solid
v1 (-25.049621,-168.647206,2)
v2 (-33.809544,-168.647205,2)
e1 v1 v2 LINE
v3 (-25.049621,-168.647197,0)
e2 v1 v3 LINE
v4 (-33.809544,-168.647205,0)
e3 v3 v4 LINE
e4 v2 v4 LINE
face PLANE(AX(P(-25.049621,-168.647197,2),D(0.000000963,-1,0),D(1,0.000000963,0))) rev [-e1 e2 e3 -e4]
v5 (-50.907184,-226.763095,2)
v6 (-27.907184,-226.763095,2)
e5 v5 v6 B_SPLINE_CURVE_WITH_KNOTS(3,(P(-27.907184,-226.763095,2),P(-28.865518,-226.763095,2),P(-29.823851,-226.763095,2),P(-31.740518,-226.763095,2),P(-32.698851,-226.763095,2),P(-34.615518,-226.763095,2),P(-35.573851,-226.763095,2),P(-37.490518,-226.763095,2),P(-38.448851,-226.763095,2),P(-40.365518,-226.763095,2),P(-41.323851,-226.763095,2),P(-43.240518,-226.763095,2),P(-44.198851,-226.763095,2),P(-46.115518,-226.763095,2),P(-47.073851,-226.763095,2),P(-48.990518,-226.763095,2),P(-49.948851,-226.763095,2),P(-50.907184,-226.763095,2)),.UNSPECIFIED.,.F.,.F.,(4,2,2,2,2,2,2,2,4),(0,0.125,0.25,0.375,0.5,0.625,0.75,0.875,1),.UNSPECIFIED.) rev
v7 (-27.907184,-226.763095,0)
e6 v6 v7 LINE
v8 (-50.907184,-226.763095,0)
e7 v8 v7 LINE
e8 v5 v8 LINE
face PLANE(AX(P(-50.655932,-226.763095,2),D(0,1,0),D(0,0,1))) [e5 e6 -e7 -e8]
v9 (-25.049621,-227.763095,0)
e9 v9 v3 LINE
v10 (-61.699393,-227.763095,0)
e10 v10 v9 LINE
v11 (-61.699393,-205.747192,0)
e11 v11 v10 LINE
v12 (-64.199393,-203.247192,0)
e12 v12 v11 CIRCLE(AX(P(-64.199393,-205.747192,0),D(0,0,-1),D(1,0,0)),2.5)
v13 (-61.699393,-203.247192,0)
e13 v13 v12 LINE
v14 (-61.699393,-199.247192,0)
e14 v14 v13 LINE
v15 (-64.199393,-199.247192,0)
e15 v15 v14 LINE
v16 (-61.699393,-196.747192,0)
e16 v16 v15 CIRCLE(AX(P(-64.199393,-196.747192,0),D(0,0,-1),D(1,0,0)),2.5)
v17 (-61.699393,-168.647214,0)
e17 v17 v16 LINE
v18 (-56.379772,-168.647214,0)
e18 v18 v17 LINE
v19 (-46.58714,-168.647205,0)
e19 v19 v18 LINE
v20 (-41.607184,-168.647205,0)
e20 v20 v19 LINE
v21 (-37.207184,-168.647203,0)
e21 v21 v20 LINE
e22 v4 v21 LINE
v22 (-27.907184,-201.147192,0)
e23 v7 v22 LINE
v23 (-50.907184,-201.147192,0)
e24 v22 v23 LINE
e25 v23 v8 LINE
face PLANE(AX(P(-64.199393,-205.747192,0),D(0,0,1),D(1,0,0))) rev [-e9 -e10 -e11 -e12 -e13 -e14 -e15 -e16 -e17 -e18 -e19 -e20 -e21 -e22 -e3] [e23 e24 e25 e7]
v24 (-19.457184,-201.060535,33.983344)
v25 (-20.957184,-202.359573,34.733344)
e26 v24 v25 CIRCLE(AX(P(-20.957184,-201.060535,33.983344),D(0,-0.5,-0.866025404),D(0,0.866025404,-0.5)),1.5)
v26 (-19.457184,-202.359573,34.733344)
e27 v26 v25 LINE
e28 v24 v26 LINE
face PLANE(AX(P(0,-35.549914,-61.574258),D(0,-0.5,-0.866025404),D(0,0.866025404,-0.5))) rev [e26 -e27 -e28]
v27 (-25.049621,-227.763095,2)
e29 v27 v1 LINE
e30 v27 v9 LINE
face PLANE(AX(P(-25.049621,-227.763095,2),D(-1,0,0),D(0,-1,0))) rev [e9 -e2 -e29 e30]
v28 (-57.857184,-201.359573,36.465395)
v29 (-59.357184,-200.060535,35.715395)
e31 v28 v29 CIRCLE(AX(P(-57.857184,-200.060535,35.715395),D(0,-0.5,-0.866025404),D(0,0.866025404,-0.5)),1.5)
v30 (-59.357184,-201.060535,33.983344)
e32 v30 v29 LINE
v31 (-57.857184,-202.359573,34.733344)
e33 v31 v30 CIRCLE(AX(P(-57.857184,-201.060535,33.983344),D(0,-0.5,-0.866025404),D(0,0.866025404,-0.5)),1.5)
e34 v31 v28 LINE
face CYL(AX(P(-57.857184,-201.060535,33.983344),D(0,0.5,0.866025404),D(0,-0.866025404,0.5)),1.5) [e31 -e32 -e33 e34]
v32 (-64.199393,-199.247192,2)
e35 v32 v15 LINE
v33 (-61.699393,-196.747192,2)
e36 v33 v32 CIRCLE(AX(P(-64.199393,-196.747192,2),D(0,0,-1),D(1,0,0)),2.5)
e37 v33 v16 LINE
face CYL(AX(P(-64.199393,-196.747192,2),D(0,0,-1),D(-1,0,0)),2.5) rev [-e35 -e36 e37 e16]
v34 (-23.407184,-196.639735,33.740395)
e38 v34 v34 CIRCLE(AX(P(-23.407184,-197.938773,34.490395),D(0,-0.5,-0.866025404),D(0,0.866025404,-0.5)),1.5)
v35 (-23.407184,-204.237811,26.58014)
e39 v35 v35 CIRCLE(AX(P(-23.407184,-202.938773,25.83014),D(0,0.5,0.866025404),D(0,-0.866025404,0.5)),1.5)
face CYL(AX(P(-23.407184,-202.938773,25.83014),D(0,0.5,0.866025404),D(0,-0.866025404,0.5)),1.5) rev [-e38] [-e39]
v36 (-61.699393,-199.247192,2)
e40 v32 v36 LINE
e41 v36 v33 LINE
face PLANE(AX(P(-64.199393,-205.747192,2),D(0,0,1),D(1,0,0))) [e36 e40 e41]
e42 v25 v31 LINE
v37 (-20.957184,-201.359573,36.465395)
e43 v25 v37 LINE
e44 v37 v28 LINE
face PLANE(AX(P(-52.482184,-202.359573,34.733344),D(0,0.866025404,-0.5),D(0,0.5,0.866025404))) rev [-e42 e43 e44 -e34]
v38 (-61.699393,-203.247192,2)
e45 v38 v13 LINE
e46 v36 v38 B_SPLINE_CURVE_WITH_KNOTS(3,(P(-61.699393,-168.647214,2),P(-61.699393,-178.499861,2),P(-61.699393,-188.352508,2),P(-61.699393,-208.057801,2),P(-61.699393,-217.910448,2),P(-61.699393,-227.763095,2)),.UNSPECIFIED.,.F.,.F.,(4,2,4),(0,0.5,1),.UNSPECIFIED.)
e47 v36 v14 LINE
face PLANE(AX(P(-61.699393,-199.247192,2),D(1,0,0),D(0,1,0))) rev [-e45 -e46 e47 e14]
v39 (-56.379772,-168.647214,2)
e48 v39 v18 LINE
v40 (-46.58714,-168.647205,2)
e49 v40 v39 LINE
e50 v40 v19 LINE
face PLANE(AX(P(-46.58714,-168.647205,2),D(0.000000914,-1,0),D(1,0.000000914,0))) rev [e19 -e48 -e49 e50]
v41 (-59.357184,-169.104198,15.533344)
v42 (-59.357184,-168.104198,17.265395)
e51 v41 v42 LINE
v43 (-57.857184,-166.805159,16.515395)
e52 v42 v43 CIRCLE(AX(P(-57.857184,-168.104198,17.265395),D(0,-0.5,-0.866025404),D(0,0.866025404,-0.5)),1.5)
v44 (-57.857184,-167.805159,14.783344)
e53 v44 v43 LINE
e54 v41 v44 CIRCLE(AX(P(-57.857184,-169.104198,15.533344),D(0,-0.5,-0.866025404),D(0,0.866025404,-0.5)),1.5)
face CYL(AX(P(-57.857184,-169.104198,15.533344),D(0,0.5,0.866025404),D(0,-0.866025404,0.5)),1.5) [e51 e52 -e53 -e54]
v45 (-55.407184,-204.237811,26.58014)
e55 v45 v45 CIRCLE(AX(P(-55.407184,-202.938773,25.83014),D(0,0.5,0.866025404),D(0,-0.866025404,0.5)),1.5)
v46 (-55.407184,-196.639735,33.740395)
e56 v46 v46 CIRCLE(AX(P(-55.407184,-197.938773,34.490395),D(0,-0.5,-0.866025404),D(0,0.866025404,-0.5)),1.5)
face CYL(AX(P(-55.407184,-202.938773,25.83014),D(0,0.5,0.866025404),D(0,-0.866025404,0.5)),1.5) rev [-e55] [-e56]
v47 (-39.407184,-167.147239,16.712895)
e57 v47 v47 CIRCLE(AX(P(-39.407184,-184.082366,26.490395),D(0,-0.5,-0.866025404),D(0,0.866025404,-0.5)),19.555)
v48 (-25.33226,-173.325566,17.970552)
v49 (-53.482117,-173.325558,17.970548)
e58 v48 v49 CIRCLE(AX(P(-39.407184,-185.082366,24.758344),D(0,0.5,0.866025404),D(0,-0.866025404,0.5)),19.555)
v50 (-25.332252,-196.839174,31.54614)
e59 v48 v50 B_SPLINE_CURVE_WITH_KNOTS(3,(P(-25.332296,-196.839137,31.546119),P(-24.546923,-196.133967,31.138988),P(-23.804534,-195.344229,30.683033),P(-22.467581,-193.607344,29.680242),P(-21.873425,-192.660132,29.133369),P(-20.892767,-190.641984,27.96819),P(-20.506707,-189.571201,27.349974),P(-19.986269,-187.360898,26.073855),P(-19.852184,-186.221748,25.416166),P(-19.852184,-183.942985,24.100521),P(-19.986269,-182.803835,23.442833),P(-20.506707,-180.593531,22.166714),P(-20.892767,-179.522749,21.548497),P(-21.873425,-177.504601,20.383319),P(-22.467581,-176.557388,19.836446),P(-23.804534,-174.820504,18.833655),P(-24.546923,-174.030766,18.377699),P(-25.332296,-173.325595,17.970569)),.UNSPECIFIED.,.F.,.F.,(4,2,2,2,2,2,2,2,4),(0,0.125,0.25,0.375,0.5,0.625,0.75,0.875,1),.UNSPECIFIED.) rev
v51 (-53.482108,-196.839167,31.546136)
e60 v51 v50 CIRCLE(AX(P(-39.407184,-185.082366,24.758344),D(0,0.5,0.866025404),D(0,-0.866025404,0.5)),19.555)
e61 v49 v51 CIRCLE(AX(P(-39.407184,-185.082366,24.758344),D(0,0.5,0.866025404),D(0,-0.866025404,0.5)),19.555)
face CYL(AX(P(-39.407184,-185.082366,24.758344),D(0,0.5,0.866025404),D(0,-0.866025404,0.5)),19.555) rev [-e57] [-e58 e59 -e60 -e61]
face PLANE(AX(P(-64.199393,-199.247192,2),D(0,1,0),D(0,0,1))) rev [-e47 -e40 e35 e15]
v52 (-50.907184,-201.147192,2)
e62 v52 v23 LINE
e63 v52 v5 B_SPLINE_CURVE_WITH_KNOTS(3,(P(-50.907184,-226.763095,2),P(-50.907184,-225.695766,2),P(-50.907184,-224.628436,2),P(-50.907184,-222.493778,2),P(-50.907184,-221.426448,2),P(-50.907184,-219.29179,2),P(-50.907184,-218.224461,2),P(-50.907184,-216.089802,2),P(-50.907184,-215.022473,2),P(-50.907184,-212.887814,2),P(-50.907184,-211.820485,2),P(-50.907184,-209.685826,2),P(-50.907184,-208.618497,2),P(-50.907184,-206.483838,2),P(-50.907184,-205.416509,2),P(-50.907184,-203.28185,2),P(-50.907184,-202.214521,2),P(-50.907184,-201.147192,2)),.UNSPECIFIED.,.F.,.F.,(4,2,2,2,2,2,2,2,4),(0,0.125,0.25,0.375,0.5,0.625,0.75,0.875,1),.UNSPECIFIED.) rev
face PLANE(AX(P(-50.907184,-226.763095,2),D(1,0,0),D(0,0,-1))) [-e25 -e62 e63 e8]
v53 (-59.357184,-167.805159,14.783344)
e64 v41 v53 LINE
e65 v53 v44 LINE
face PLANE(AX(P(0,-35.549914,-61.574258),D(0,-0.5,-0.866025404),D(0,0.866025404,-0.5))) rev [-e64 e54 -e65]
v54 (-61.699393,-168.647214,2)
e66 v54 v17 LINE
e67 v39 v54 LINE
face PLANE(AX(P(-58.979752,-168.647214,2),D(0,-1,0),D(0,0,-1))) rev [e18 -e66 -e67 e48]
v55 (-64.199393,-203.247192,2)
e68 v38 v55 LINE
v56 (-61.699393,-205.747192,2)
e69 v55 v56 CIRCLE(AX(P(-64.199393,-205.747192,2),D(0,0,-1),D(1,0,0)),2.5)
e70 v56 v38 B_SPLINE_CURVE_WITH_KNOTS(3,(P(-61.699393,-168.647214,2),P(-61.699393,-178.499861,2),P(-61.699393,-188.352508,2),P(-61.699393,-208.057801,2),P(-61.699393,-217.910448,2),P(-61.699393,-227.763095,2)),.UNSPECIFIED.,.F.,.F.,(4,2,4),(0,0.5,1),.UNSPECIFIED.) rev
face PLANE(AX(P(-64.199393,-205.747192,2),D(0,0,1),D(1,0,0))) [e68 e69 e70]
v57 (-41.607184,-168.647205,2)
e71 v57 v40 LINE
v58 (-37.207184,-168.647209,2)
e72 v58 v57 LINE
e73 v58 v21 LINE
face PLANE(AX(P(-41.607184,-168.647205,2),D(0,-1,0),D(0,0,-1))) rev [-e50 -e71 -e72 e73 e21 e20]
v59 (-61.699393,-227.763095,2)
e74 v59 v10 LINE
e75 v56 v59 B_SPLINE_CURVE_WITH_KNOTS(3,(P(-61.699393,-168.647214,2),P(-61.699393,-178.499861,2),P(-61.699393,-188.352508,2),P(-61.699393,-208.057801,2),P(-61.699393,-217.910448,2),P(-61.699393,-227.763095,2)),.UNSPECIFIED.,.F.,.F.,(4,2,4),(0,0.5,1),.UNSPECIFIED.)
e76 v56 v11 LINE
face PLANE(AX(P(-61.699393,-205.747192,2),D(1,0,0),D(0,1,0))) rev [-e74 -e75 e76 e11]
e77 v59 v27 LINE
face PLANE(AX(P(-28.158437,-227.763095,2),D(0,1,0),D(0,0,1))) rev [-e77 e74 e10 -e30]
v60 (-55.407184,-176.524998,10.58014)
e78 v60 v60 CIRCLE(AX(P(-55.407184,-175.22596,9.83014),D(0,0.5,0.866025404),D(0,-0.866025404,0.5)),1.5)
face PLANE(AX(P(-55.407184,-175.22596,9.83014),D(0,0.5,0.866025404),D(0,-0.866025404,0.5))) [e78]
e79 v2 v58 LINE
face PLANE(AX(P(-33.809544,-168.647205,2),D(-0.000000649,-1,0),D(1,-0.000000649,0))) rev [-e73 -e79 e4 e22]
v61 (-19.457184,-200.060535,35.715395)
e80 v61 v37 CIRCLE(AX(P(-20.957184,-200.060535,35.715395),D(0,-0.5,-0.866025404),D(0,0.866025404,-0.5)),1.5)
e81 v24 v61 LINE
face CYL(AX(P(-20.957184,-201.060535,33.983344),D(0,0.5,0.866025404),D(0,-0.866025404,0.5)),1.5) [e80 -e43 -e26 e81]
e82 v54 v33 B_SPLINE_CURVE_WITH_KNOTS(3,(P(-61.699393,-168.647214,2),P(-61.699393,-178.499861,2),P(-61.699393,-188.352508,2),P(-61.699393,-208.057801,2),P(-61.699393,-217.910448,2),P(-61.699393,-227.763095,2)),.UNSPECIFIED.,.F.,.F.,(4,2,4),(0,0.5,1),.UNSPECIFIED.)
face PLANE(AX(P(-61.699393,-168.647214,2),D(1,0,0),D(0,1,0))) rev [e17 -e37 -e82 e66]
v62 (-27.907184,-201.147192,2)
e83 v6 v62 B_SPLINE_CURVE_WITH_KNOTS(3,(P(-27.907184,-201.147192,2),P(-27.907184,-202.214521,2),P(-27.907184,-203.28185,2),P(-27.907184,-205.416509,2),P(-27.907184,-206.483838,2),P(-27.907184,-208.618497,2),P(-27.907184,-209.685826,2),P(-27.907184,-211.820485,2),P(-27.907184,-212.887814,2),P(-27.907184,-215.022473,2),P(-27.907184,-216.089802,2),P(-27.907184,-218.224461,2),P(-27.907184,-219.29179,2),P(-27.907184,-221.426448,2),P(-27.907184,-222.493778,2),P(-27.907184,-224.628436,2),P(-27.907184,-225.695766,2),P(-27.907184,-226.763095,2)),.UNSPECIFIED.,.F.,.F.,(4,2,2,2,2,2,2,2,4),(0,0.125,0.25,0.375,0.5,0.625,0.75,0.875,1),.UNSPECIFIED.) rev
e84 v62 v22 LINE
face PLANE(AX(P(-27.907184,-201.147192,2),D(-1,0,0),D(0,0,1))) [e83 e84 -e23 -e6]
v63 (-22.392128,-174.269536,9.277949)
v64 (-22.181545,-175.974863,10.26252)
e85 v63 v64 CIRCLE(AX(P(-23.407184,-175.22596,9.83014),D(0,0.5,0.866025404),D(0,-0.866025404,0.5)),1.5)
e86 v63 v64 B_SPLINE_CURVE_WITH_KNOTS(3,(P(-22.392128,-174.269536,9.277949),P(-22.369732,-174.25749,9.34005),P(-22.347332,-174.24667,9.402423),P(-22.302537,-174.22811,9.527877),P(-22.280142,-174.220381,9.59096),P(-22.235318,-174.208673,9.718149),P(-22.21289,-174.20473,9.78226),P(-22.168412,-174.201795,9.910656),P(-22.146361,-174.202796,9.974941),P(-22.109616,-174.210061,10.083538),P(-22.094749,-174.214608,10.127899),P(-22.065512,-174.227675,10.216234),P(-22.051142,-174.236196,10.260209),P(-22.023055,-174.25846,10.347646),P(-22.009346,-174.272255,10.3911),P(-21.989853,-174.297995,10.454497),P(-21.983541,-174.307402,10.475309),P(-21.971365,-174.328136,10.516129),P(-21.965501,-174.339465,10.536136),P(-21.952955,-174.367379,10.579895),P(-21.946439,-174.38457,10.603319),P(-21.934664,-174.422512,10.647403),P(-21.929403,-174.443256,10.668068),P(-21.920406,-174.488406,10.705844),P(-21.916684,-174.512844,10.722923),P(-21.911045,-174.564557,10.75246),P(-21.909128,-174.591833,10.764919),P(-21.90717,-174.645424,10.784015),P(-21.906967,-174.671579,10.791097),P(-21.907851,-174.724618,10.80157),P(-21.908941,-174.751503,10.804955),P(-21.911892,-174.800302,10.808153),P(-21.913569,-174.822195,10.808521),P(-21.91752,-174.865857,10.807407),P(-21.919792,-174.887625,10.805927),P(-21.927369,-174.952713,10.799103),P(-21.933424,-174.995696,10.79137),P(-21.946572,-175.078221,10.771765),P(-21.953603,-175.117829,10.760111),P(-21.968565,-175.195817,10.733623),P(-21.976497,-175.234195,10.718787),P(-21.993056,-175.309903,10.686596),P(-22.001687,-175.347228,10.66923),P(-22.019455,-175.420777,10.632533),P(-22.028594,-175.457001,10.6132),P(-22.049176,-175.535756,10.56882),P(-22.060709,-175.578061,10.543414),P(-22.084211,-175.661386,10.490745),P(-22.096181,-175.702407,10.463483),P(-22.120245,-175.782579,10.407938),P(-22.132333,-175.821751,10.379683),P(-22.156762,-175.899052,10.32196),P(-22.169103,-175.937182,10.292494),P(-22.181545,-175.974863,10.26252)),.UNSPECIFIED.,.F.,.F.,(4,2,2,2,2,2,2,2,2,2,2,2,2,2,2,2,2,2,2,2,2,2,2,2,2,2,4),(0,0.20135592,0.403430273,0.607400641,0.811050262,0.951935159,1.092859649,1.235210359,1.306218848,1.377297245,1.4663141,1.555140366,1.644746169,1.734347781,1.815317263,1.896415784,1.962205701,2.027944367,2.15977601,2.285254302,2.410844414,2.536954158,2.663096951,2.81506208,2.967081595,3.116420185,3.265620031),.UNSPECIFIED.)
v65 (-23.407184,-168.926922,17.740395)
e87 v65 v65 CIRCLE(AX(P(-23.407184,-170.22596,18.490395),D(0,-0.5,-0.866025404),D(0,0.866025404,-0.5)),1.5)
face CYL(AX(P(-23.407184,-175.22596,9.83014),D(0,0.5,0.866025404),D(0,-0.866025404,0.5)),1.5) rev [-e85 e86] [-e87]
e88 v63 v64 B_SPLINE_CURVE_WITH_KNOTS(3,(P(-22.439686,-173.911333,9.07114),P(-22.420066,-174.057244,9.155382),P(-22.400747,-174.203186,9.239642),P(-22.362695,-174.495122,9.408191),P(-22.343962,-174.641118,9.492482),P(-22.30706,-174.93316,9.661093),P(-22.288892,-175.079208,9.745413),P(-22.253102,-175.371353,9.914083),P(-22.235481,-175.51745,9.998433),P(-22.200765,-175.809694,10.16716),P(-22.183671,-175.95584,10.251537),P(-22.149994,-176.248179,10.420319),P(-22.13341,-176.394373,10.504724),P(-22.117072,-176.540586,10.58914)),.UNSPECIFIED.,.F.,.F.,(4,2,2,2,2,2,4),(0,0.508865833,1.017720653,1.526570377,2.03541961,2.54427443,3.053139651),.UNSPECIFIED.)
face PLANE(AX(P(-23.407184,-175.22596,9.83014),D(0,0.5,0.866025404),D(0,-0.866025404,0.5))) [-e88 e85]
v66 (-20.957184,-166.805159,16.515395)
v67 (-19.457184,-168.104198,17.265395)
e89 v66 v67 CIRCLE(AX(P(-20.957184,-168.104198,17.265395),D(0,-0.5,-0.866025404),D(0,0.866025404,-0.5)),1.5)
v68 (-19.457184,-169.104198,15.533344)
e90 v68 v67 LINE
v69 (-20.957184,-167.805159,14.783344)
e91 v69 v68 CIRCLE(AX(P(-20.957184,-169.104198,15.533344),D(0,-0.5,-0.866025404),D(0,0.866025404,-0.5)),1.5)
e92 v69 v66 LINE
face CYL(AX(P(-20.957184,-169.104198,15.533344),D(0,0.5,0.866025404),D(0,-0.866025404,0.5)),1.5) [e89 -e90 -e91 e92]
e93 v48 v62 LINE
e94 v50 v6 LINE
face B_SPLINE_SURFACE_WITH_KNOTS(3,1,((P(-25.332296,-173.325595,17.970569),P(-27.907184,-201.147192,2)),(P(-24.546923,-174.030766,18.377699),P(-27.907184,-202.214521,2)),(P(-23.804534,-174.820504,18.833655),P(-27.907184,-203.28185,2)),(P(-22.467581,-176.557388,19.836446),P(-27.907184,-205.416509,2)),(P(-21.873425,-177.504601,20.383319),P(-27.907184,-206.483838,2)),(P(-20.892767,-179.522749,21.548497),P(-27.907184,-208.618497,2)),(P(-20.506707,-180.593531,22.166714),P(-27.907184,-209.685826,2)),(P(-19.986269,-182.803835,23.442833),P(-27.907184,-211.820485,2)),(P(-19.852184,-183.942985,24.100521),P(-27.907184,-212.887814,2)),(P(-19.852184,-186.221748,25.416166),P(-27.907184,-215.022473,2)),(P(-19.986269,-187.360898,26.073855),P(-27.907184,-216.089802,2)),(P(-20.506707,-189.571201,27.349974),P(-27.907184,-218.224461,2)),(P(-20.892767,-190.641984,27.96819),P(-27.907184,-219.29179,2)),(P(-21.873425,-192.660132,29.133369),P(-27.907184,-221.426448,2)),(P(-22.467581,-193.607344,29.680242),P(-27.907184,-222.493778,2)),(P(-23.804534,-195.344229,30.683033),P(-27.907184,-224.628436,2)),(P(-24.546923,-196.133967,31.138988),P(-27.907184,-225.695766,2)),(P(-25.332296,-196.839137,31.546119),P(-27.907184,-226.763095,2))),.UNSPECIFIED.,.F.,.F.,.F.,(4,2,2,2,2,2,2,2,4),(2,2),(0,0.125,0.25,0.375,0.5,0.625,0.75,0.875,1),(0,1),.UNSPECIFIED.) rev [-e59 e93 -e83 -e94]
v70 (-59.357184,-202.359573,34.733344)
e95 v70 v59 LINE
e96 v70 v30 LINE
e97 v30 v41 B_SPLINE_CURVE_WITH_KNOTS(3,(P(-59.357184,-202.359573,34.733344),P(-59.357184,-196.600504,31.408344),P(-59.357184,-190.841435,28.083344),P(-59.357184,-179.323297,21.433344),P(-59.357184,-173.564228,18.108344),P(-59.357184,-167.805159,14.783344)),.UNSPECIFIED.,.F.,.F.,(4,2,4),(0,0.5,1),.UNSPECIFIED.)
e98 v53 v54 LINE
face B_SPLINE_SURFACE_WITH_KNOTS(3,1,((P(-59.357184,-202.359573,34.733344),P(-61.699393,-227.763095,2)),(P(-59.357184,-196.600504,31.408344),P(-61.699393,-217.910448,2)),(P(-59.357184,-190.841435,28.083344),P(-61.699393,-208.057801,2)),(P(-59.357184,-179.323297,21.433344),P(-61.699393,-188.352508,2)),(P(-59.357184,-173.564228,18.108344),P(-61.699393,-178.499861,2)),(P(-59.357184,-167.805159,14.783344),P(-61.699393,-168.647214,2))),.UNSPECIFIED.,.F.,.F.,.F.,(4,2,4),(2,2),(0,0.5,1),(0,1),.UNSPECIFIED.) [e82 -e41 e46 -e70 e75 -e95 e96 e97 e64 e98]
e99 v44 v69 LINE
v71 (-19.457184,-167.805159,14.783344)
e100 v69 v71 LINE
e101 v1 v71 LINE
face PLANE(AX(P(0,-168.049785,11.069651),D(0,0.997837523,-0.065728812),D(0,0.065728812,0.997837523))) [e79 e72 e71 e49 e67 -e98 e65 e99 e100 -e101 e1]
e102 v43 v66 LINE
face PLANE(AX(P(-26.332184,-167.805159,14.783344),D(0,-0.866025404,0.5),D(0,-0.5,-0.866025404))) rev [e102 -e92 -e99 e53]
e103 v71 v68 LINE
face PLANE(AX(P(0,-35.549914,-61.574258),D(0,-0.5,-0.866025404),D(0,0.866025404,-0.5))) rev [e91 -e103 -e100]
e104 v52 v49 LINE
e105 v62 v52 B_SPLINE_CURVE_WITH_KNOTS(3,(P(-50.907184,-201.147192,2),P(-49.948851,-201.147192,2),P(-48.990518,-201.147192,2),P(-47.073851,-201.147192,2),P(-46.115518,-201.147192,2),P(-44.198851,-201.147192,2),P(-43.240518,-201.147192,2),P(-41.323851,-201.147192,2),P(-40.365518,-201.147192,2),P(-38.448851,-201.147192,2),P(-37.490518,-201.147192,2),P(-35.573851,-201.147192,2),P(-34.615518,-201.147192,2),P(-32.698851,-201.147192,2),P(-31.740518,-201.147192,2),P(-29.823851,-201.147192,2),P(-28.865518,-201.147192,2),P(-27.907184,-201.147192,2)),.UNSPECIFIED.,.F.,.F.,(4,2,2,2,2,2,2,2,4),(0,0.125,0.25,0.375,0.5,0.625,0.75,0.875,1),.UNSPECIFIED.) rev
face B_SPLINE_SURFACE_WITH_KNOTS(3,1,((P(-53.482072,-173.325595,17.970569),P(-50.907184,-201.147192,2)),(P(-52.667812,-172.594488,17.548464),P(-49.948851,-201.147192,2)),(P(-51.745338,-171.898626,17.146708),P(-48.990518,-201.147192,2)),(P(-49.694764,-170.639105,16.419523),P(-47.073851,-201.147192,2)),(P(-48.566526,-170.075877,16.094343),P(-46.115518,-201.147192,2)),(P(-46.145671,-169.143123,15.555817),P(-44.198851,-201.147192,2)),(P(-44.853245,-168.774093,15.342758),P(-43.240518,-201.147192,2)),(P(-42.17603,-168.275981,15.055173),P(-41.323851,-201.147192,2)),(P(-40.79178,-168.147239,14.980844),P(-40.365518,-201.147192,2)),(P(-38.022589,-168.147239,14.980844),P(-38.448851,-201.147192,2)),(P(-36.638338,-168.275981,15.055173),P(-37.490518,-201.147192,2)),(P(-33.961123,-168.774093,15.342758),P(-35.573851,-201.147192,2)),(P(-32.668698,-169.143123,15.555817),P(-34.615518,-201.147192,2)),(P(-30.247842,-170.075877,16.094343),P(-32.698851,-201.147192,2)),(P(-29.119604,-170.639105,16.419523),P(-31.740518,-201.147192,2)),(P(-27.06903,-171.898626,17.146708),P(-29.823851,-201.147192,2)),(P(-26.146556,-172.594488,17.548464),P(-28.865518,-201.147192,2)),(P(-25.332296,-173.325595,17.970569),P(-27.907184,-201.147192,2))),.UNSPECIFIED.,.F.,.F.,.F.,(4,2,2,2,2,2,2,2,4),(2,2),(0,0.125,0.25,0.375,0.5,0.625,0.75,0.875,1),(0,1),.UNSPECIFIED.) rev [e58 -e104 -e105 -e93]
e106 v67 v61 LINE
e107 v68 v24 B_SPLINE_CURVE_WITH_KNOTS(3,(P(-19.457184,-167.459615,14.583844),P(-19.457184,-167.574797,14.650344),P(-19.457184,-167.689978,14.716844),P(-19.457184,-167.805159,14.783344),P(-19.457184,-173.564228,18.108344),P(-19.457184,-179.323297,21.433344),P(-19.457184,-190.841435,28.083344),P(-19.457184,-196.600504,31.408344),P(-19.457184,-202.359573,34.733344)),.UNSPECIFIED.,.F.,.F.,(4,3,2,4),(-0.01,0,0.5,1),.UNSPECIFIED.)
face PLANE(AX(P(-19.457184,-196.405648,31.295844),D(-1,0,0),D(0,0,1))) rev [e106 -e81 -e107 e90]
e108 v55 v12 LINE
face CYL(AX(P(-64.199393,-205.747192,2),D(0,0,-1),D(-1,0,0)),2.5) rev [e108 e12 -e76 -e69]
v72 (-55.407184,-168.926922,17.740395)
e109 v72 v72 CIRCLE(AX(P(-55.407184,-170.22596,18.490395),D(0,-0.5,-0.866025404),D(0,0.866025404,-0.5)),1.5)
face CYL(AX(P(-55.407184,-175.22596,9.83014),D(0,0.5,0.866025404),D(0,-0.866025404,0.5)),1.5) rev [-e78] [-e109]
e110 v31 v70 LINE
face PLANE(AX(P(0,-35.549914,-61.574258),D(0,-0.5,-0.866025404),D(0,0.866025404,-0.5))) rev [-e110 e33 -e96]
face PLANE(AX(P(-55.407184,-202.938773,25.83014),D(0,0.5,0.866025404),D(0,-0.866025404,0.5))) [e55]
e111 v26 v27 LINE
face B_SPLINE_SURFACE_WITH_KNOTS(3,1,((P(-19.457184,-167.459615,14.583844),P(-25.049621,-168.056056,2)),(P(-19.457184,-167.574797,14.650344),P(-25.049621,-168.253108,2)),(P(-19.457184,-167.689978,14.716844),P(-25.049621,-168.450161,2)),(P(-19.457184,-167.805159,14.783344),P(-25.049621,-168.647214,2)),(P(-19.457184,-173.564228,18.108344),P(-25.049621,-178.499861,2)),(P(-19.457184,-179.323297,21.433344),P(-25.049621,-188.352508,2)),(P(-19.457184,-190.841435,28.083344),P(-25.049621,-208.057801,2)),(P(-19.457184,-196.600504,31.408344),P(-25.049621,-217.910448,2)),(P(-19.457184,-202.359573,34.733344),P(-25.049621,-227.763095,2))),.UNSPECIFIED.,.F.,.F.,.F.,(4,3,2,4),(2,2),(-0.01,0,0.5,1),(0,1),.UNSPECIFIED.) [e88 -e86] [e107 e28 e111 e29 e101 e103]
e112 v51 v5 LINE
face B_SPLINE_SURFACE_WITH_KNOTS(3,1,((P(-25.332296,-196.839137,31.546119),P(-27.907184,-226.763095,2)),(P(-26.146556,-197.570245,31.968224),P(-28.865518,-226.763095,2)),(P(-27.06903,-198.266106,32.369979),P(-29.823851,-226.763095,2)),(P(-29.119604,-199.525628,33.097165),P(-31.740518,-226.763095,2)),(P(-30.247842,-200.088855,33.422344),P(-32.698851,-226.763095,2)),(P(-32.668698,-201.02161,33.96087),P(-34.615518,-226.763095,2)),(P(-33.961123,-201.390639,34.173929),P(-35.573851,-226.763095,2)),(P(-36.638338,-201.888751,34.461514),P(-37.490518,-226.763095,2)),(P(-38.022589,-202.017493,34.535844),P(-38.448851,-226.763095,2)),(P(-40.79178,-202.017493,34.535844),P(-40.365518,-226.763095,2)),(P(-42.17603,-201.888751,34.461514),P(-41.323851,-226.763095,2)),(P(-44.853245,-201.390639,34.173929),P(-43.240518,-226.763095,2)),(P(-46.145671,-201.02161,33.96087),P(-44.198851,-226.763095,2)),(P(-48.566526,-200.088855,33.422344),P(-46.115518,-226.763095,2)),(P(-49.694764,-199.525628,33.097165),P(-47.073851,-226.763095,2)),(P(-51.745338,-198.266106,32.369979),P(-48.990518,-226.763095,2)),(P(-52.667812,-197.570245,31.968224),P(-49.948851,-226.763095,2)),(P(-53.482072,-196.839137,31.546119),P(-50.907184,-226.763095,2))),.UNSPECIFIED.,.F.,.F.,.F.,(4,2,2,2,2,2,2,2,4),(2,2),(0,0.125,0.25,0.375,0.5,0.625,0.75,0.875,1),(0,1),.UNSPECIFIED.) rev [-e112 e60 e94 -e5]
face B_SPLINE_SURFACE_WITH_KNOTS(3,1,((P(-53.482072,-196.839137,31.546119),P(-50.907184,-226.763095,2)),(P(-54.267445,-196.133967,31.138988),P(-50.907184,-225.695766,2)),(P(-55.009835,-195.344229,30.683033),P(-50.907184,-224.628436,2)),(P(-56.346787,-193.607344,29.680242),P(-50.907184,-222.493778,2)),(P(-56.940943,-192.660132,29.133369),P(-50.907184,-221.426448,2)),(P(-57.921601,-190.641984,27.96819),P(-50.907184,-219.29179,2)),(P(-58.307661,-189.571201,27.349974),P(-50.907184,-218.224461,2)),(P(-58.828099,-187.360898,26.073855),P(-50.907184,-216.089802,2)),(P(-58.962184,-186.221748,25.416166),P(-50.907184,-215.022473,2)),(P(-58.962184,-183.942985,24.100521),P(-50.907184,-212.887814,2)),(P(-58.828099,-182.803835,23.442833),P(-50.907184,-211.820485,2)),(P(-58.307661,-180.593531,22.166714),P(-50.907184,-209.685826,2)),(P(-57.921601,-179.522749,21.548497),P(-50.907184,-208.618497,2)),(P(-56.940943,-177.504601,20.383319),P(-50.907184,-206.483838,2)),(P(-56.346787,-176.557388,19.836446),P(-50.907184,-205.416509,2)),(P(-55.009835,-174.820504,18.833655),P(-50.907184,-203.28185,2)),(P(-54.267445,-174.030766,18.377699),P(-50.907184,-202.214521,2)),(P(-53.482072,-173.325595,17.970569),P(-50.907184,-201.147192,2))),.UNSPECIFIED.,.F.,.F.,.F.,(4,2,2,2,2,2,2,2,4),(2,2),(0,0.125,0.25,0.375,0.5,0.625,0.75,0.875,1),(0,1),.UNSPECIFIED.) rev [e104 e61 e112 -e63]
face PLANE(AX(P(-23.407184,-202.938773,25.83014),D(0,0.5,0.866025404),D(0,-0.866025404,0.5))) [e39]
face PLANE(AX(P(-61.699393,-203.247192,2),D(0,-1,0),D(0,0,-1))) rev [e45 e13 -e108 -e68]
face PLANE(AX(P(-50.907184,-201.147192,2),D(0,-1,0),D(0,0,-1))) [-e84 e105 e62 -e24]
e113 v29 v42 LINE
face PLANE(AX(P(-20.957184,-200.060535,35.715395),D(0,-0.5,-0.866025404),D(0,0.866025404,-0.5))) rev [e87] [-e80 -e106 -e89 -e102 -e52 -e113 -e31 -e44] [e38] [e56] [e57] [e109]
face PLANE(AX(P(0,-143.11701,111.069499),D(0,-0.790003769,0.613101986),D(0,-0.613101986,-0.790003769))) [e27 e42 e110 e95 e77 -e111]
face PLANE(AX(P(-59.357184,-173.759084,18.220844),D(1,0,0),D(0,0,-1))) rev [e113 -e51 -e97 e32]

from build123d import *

# Parameters (mm, degrees)
BOSS_EXTRUDE1_DEPTH = 2
SKETCH3_R           = 19.555
BOSS_EXTRUDE3_DEPTH = 2
SKETCH10_R          = 1.5
CUT_EXTRUDE1_DEPTH  = 10
BOSS_EXTRUDE4_START = 2
SKETCH11_R          = 2.25
SKETCH11_R_2        = 1.5
BOSS_EXTRUDE4_DEPTH = 2


with BuildPart() as part:
    # Sketch1 → Boss-Extrude1 (new body)
    with BuildSketch(Plane.XY):
        with BuildLine():
            Line((-41.607184222, -168.647205393), (-46.587139734, -168.647205393))
            Line((-46.587139734, -168.647205393), (-56.379772227, -168.647214346))
            Line((-56.379772227, -168.647214346), (-58.979752441, -168.647214346))
            Line((-58.979752441, -168.647214346), (-61.699393133, -168.647214346))
            Line((-61.699393133, -168.647214346), (-61.699393133, -196.747191902))
            ThreePointArc((-61.699393133, -196.747191902), (-62.43162618, -198.514958855), (-64.199393133, -199.247191902))
            Line((-64.199393133, -199.247191902), (-61.699393133, -199.247191902))
            Line((-61.699393133, -199.247191902), (-61.699393133, -203.247191902))
            Line((-61.699393133, -203.247191902), (-64.199393133, -203.247191902))
            ThreePointArc((-64.199393133, -203.247191902), (-62.43162618, -203.979424949), (-61.699393133, -205.747191902))
            Line((-61.699393133, -205.747191902), (-61.699393133, -227.763094952))
            Line((-61.699393133, -227.763094952), (-50.655931604, -227.763094952))
            Line((-50.655931604, -227.763094952), (-28.158436841, -227.763094952))
            Line((-28.158436841, -227.763094952), (-25.049620936, -227.763094952))
            Line((-25.049620936, -227.763094952), (-25.049620936, -168.647196959))
            Line((-25.049620936, -168.647196959), (-33.809543561, -168.647205393))
            Line((-33.809543561, -168.647205393), (-37.207184222, -168.647203189))
            Line((-37.207184222, -168.647203189), (-41.607184222, -168.647205393))
        make_face()
        Polygon((-50.655931604, -226.763094952), (-50.907184222, -226.763094952), (-50.907184222, -201.147191902), (-45.907184222, -201.147191902), (-32.907184222, -201.147191902), (-27.907184222, -201.147191902), (-27.907184222, -226.763094952), (-28.158436841, -226.763094952), align=None, mode=Mode.SUBTRACT)
    extrude(amount=BOSS_EXTRUDE1_DEPTH)



with BuildPart() as body_2:
    # Sketch3 → Boss-Extrude3 (new body)
    with BuildSketch(Plane(origin=(0, -34.549914252, -59.842206881), x_dir=(-1, 0, 0), z_dir=(0, -0.500000000000004, -0.8660254037844363))):
        with BuildLine():
            Line((20.957184222, -192.615202808), (26.332184222, -192.615202808))
            Line((26.332184222, -192.615202808), (28.207184222, -192.615202808))
            Line((28.207184222, -192.615202808), (30.057184222, -192.615202808))
            Line((30.057184222, -192.615202808), (52.482184222, -192.615202808))
            Line((52.482184222, -192.615202808), (57.857184222, -192.615202808))
            ThreePointArc((57.857184222, -192.615202808), (58.917844394, -192.17586298), (59.357184222, -191.115202808))
            Line((59.357184222, -191.115202808), (59.357184222, -185.740202808))
            Line((59.357184222, -185.740202808), (59.357184222, -159.590202808))
            Line((59.357184222, -159.590202808), (59.357184222, -154.215202808))
            ThreePointArc((59.357184222, -154.215202808), (58.917844394, -153.154542636), (57.857184222, -152.715202808))
            Line((57.857184222, -152.715202808), (52.482184222, -152.715202808))
            Line((52.482184222, -152.715202808), (26.332184222, -152.715202808))
            Line((26.332184222, -152.715202808), (20.957184222, -152.715202808))
            ThreePointArc((20.957184222, -152.715202808), (19.89652405, -153.154542636), (19.457184222, -154.215202808))
            Line((19.457184222, -154.215202808), (19.457184222, -159.590202808))
            Line((19.457184222, -159.590202808), (19.457184222, -185.740202808))
            Line((19.457184222, -185.740202808), (19.457184222, -191.115202808))
            ThreePointArc((19.457184222, -191.115202808), (19.89652405, -192.17586298), (20.957184222, -192.615202808))
        make_face()
        with Locations(Location((39.407184222, -172.665202808, 0), (0, 0, 270))):
            Circle(SKETCH3_R, mode=Mode.SUBTRACT)
        with BuildLine():
            ThreePointArc((53.157184222, -188.665202808), (55.407184222, -190.915202808), (57.657184222, -188.665202808))
            ThreePointArc((57.657184222, -188.665202808), (55.407184222, -186.415202808), (53.157184222, -188.665202808))
        make_face(mode=Mode.SUBTRACT)
        with BuildLine():
            ThreePointArc((53.157184222, -156.665202808), (55.407184222, -158.915202808), (57.657184222, -156.665202808))
            ThreePointArc((57.657184222, -156.665202808), (55.407184222, -154.415202808), (53.157184222, -156.665202808))
        make_face(mode=Mode.SUBTRACT)
        with BuildLine():
            ThreePointArc((21.157184222, -188.665202808), (23.407184222, -190.915202808), (25.657184222, -188.665202808))
            ThreePointArc((25.657184222, -188.665202808), (23.407184222, -186.415202808), (21.157184222, -188.665202808))
        make_face(mode=Mode.SUBTRACT)
        with BuildLine():
            ThreePointArc((21.157184222, -156.665202808), (23.407184222, -158.915202808), (25.657184222, -156.665202808))
            ThreePointArc((25.657184222, -156.665202808), (23.407184222, -154.415202808), (21.157184222, -156.665202808))
        make_face(mode=Mode.SUBTRACT)
    extrude(amount=BOSS_EXTRUDE3_DEPTH)


with BuildPart() as part_1:
    add(part.part)

    add(body_2.part)  # Loft1 merges body 2
    # Sketch6 → Loft1 section 0
    with BuildSketch(Plane(origin=(0, -35.549914252, -61.574257689), x_dir=(-1, 0, 0), z_dir=(0, -0.5000000000000042, -0.8660254037844362))):
        with BuildLine():
            Line((19.457184222, -152.715202808), (59.357184222, -152.715202808))
            Line((59.357184222, -152.715202808), (59.357184222, -192.615202808))
            Line((59.357184222, -192.615202808), (19.457184222, -192.615202808))
            Line((19.457184222, -192.615202808), (19.457184222, -152.715202808))
        make_face()
    # Sketch5 → Loft1 section 1
    with BuildSketch(Plane.XY.offset(2)):
        with BuildLine():
            Line((-61.699393133, -168.647214346), (-25.049620936, -168.647214346))
            Line((-25.049620936, -168.647214346), (-25.049620936, -227.763094952))
            Line((-25.049620936, -227.763094952), (-61.699393133, -227.763094952))
            Line((-61.699393133, -227.763094952), (-61.699393133, -168.647214346))
        make_face()
    loft()

    # Cut-Loft1: read off the stored shape, not the designer's step
    # Cut-Loft1: loft between two sections, ruled curve by curve
    cut_loft1_from = [
        Edge.make_bspline([(-53.482072433, -173.325595412, 17.970568917), (-52.667812044, -172.594487517, 17.548463577), (-51.745338218, -171.898626452, 17.146708004), (-49.694764128, -170.639104746, 16.419522808), (-48.566526461, -170.075877129, 16.094343191), (-46.145670861, -169.143122954, 15.555817318), (-44.853245437, -168.774093393, 15.342758001), (-42.176030481, -168.275981497, 15.055172964), (-40.79177962, -168.147239462, 14.980843715), (-38.022588825, -168.147239462, 14.980843715), (-36.638337963, -168.275981497, 15.055172964), (-33.961123008, -168.774093393, 15.342758001), (-32.668697584, -169.143122954, 15.555817318), (-30.247841983, -170.075877129, 16.094343191), (-29.119604317, -170.639104746, 16.419522808), (-27.069030226, -171.898626452, 17.146708004), (-26.146556401, -172.594487517, 17.548463577), (-25.332296011, -173.325595412, 17.970568917)], [0, 0, 0, 0, 0.125, 0.125, 0.25, 0.25, 0.375, 0.375, 0.5, 0.5, 0.625, 0.625, 0.75, 0.75, 0.875, 0.875, 1, 1, 1, 1], 3),
        Edge.make_bspline([(-25.332296011, -173.325595412, 17.970568917), (-24.546923358, -174.030765595, 18.377699112), (-23.80453356, -174.820503558, 18.833654538), (-22.467581287, -176.557388485, 19.836445518), (-21.873425062, -177.5046005, 20.38331863), (-20.892767461, -179.522748872, 21.548497135), (-20.506707178, -180.593531168, 22.166713582), (-19.986269086, -182.803834674, 23.442832907), (-19.852184222, -183.942984641, 24.100521447), (-19.852184222, -186.221747825, 25.416165984), (-19.986269086, -187.360897792, 26.073854524), (-20.506707178, -189.571201298, 27.349973849), (-20.892767461, -190.641983594, 27.968190295), (-21.873425062, -192.660131966, 29.133368801), (-22.467581287, -193.607343981, 29.680241913), (-23.80453356, -195.344228908, 30.683032893), (-24.546923358, -196.133966872, 31.138988319), (-25.332296011, -196.839137054, 31.546118514)], [0, 0, 0, 0, 0.125, 0.125, 0.25, 0.25, 0.375, 0.375, 0.5, 0.5, 0.625, 0.625, 0.75, 0.75, 0.875, 0.875, 1, 1, 1, 1], 3),
        Edge.make_bspline([(-53.482072433, -196.839137054, 31.546118514), (-54.267445087, -196.133966872, 31.138988319), (-55.009834884, -195.344228908, 30.683032893), (-56.346787158, -193.607343981, 29.680241913), (-56.940943382, -192.660131966, 29.133368801), (-57.921600984, -190.641983594, 27.968190295), (-58.307661266, -189.571201298, 27.349973849), (-58.828099359, -187.360897792, 26.073854524), (-58.962184222, -186.221747825, 25.416165984), (-58.962184222, -183.942984641, 24.100521447), (-58.828099359, -182.803834674, 23.442832907), (-58.307661266, -180.593531168, 22.166713582), (-57.921600984, -179.522748872, 21.548497135), (-56.940943382, -177.5046005, 20.38331863), (-56.346787158, -176.557388485, 19.836445518), (-55.009834884, -174.820503558, 18.833654538), (-54.267445087, -174.030765595, 18.377699112), (-53.482072433, -173.325595412, 17.970568917)], [0, 0, 0, 0, 0.125, 0.125, 0.25, 0.25, 0.375, 0.375, 0.5, 0.5, 0.625, 0.625, 0.75, 0.75, 0.875, 0.875, 1, 1, 1, 1], 3),
        Edge.make_bspline([(-25.332296011, -196.839137054, 31.546118514), (-26.146556401, -197.570244949, 31.968223854), (-27.069030226, -198.266106014, 32.369979427), (-29.119604317, -199.52562772, 33.097164623), (-30.247841983, -200.088855337, 33.422344239), (-32.668697584, -201.021609512, 33.960870113), (-33.961123008, -201.390639073, 34.17392943), (-36.638337963, -201.888750969, 34.461514467), (-38.022588825, -202.017493004, 34.535843715), (-40.79177962, -202.017493004, 34.535843715), (-42.176030481, -201.888750969, 34.461514467), (-44.853245437, -201.390639073, 34.17392943), (-46.145670861, -201.021609512, 33.960870113), (-48.566526461, -200.088855337, 33.422344239), (-49.694764128, -199.52562772, 33.097164623), (-51.745338218, -198.266106014, 32.369979427), (-52.667812044, -197.570244949, 31.968223854), (-53.482072433, -196.839137054, 31.546118514)], [0, 0, 0, 0, 0.125, 0.125, 0.25, 0.25, 0.375, 0.375, 0.5, 0.5, 0.625, 0.625, 0.75, 0.75, 0.875, 0.875, 1, 1, 1, 1], 3),
    ]
    cut_loft1_to = [
        Edge.make_bspline([(-50.907184222, -201.147191902, 2), (-49.948850889, -201.147191902, 2), (-48.990517556, -201.147191902, 2), (-47.073850889, -201.147191902, 2), (-46.115517556, -201.147191902, 2), (-44.198850889, -201.147191902, 2), (-43.240517556, -201.147191902, 2), (-41.323850889, -201.147191902, 2), (-40.365517556, -201.147191902, 2), (-38.448850889, -201.147191902, 2), (-37.490517556, -201.147191902, 2), (-35.573850889, -201.147191902, 2), (-34.615517556, -201.147191902, 2), (-32.698850889, -201.147191902, 2), (-31.740517556, -201.147191902, 2), (-29.823850889, -201.147191902, 2), (-28.865517556, -201.147191902, 2), (-27.907184222, -201.147191902, 2)], [0, 0, 0, 0, 0.125, 0.125, 0.25, 0.25, 0.375, 0.375, 0.5, 0.5, 0.625, 0.625, 0.75, 0.75, 0.875, 0.875, 1, 1, 1, 1], 3),
        Edge.make_bspline([(-27.907184222, -201.147191902, 2), (-27.907184222, -202.214521196, 2), (-27.907184222, -203.28185049, 2), (-27.907184222, -205.416509077, 2), (-27.907184222, -206.483838371, 2), (-27.907184222, -208.618496958, 2), (-27.907184222, -209.685826252, 2), (-27.907184222, -211.820484839, 2), (-27.907184222, -212.887814133, 2), (-27.907184222, -215.022472721, 2), (-27.907184222, -216.089802014, 2), (-27.907184222, -218.224460602, 2), (-27.907184222, -219.291789896, 2), (-27.907184222, -221.426448483, 2), (-27.907184222, -222.493777777, 2), (-27.907184222, -224.628436364, 2), (-27.907184222, -225.695765658, 2), (-27.907184222, -226.763094952, 2)], [0, 0, 0, 0, 0.125, 0.125, 0.25, 0.25, 0.375, 0.375, 0.5, 0.5, 0.625, 0.625, 0.75, 0.75, 0.875, 0.875, 1, 1, 1, 1], 3),
        Edge.make_bspline([(-50.907184222, -226.763094952, 2), (-50.907184222, -225.695765658, 2), (-50.907184222, -224.628436364, 2), (-50.907184222, -222.493777777, 2), (-50.907184222, -221.426448483, 2), (-50.907184222, -219.291789896, 2), (-50.907184222, -218.224460602, 2), (-50.907184222, -216.089802014, 2), (-50.907184222, -215.022472721, 2), (-50.907184222, -212.887814133, 2), (-50.907184222, -211.820484839, 2), (-50.907184222, -209.685826252, 2), (-50.907184222, -208.618496958, 2), (-50.907184222, -206.483838371, 2), (-50.907184222, -205.416509077, 2), (-50.907184222, -203.28185049, 2), (-50.907184222, -202.214521196, 2), (-50.907184222, -201.147191902, 2)], [0, 0, 0, 0, 0.125, 0.125, 0.25, 0.25, 0.375, 0.375, 0.5, 0.5, 0.625, 0.625, 0.75, 0.75, 0.875, 0.875, 1, 1, 1, 1], 3),
        Edge.make_bspline([(-27.907184222, -226.763094952, 2), (-28.865517556, -226.763094952, 2), (-29.823850889, -226.763094952, 2), (-31.740517556, -226.763094952, 2), (-32.698850889, -226.763094952, 2), (-34.615517556, -226.763094952, 2), (-35.573850889, -226.763094952, 2), (-37.490517556, -226.763094952, 2), (-38.448850889, -226.763094952, 2), (-40.365517556, -226.763094952, 2), (-41.323850889, -226.763094952, 2), (-43.240517556, -226.763094952, 2), (-44.198850889, -226.763094952, 2), (-46.115517556, -226.763094952, 2), (-47.073850889, -226.763094952, 2), (-48.990517556, -226.763094952, 2), (-49.948850889, -226.763094952, 2), (-50.907184222, -226.763094952, 2)], [0, 0, 0, 0, 0.125, 0.125, 0.25, 0.25, 0.375, 0.375, 0.5, 0.5, 0.625, 0.625, 0.75, 0.75, 0.875, 0.875, 1, 1, 1, 1], 3),
    ]
    cut_loft1 = Solid(Shell([*[Face.make_surface_from_curves(cut_loft1_from[k], cut_loft1_to[k]) for k in range(4)], Face(Wire(cut_loft1_from)), Face(Wire(cut_loft1_to))]))
    add(cut_loft1, mode=Mode.SUBTRACT)

    # Sketch10 → Cut-Extrude1 (cut)
    with BuildSketch(Plane(origin=(0, -34.549914252, -59.842206881), x_dir=(1, 0, 0), z_dir=(0, 0.5000000000000042, 0.8660254037844362))):
        with Locations(Location((-55.407184222, -156.665202808, 0), (0, 0, 270))):
            Circle(SKETCH10_R)
        with Locations(Location((-23.407184222, -156.665202808, 0), (0, 0, 324.794812126))):
            Circle(SKETCH10_R)
        with Locations(Location((-23.407184222, -188.665202808, 0), (0, 0, 270))):
            Circle(SKETCH10_R)
        with Locations(Location((-55.407184222, -188.665202808, 0), (0, 0, 270))):
            Circle(SKETCH10_R)
    extrude(amount=-CUT_EXTRUDE1_DEPTH, mode=Mode.SUBTRACT)

    # Sketch11 → Boss-Extrude4 (add)
    # profile 1 of 4: a face of its own
    with BuildSketch(Plane(origin=(0, -35.549914252, -61.574257689), x_dir=(1, 0, 0), z_dir=(0, 0.5000000000000046, 0.8660254037844362)).offset(BOSS_EXTRUDE4_START)):
        with Locations((-55.407184222, -156.665202808)):
            Circle(SKETCH11_R)
        with Locations(Location((-55.407184222, -156.665202808, 0), (0, 0, 270))):
            Circle(SKETCH11_R_2, mode=Mode.SUBTRACT)
    # profile 2 of 4: a face of its own
    with BuildSketch(Plane(origin=(0, -35.549914252, -61.574257689), x_dir=(1, 0, 0), z_dir=(0, 0.5000000000000046, 0.8660254037844362)).offset(BOSS_EXTRUDE4_START)):
        with Locations((-23.407184222, -156.665202808)):
            Circle(SKETCH11_R)
        with Locations(Location((-23.407184222, -156.665202808, 0), (0, 0, 324.794812126))):
            Circle(SKETCH11_R_2, mode=Mode.SUBTRACT)
    # profile 3 of 4: a face of its own
    with BuildSketch(Plane(origin=(0, -35.549914252, -61.574257689), x_dir=(1, 0, 0), z_dir=(0, 0.5000000000000046, 0.8660254037844362)).offset(BOSS_EXTRUDE4_START)):
        with Locations((-55.407184222, -188.665202808)):
            Circle(SKETCH11_R)
        with Locations(Location((-55.407184222, -188.665202808, 0), (0, 0, 270))):
            Circle(SKETCH11_R_2, mode=Mode.SUBTRACT)
    # profile 4 of 4: a face of its own
    with BuildSketch(Plane(origin=(0, -35.549914252, -61.574257689), x_dir=(1, 0, 0), z_dir=(0, 0.5000000000000046, 0.8660254037844362)).offset(BOSS_EXTRUDE4_START)):
        with Locations((-23.407184222, -188.665202808)):
            Circle(SKETCH11_R)
        with Locations(Location((-23.407184222, -188.665202808, 0), (0, 0, 270))):
            Circle(SKETCH11_R_2, mode=Mode.SUBTRACT)
    extrude(amount=-BOSS_EXTRUDE4_DEPTH)


solid = part_1.part
